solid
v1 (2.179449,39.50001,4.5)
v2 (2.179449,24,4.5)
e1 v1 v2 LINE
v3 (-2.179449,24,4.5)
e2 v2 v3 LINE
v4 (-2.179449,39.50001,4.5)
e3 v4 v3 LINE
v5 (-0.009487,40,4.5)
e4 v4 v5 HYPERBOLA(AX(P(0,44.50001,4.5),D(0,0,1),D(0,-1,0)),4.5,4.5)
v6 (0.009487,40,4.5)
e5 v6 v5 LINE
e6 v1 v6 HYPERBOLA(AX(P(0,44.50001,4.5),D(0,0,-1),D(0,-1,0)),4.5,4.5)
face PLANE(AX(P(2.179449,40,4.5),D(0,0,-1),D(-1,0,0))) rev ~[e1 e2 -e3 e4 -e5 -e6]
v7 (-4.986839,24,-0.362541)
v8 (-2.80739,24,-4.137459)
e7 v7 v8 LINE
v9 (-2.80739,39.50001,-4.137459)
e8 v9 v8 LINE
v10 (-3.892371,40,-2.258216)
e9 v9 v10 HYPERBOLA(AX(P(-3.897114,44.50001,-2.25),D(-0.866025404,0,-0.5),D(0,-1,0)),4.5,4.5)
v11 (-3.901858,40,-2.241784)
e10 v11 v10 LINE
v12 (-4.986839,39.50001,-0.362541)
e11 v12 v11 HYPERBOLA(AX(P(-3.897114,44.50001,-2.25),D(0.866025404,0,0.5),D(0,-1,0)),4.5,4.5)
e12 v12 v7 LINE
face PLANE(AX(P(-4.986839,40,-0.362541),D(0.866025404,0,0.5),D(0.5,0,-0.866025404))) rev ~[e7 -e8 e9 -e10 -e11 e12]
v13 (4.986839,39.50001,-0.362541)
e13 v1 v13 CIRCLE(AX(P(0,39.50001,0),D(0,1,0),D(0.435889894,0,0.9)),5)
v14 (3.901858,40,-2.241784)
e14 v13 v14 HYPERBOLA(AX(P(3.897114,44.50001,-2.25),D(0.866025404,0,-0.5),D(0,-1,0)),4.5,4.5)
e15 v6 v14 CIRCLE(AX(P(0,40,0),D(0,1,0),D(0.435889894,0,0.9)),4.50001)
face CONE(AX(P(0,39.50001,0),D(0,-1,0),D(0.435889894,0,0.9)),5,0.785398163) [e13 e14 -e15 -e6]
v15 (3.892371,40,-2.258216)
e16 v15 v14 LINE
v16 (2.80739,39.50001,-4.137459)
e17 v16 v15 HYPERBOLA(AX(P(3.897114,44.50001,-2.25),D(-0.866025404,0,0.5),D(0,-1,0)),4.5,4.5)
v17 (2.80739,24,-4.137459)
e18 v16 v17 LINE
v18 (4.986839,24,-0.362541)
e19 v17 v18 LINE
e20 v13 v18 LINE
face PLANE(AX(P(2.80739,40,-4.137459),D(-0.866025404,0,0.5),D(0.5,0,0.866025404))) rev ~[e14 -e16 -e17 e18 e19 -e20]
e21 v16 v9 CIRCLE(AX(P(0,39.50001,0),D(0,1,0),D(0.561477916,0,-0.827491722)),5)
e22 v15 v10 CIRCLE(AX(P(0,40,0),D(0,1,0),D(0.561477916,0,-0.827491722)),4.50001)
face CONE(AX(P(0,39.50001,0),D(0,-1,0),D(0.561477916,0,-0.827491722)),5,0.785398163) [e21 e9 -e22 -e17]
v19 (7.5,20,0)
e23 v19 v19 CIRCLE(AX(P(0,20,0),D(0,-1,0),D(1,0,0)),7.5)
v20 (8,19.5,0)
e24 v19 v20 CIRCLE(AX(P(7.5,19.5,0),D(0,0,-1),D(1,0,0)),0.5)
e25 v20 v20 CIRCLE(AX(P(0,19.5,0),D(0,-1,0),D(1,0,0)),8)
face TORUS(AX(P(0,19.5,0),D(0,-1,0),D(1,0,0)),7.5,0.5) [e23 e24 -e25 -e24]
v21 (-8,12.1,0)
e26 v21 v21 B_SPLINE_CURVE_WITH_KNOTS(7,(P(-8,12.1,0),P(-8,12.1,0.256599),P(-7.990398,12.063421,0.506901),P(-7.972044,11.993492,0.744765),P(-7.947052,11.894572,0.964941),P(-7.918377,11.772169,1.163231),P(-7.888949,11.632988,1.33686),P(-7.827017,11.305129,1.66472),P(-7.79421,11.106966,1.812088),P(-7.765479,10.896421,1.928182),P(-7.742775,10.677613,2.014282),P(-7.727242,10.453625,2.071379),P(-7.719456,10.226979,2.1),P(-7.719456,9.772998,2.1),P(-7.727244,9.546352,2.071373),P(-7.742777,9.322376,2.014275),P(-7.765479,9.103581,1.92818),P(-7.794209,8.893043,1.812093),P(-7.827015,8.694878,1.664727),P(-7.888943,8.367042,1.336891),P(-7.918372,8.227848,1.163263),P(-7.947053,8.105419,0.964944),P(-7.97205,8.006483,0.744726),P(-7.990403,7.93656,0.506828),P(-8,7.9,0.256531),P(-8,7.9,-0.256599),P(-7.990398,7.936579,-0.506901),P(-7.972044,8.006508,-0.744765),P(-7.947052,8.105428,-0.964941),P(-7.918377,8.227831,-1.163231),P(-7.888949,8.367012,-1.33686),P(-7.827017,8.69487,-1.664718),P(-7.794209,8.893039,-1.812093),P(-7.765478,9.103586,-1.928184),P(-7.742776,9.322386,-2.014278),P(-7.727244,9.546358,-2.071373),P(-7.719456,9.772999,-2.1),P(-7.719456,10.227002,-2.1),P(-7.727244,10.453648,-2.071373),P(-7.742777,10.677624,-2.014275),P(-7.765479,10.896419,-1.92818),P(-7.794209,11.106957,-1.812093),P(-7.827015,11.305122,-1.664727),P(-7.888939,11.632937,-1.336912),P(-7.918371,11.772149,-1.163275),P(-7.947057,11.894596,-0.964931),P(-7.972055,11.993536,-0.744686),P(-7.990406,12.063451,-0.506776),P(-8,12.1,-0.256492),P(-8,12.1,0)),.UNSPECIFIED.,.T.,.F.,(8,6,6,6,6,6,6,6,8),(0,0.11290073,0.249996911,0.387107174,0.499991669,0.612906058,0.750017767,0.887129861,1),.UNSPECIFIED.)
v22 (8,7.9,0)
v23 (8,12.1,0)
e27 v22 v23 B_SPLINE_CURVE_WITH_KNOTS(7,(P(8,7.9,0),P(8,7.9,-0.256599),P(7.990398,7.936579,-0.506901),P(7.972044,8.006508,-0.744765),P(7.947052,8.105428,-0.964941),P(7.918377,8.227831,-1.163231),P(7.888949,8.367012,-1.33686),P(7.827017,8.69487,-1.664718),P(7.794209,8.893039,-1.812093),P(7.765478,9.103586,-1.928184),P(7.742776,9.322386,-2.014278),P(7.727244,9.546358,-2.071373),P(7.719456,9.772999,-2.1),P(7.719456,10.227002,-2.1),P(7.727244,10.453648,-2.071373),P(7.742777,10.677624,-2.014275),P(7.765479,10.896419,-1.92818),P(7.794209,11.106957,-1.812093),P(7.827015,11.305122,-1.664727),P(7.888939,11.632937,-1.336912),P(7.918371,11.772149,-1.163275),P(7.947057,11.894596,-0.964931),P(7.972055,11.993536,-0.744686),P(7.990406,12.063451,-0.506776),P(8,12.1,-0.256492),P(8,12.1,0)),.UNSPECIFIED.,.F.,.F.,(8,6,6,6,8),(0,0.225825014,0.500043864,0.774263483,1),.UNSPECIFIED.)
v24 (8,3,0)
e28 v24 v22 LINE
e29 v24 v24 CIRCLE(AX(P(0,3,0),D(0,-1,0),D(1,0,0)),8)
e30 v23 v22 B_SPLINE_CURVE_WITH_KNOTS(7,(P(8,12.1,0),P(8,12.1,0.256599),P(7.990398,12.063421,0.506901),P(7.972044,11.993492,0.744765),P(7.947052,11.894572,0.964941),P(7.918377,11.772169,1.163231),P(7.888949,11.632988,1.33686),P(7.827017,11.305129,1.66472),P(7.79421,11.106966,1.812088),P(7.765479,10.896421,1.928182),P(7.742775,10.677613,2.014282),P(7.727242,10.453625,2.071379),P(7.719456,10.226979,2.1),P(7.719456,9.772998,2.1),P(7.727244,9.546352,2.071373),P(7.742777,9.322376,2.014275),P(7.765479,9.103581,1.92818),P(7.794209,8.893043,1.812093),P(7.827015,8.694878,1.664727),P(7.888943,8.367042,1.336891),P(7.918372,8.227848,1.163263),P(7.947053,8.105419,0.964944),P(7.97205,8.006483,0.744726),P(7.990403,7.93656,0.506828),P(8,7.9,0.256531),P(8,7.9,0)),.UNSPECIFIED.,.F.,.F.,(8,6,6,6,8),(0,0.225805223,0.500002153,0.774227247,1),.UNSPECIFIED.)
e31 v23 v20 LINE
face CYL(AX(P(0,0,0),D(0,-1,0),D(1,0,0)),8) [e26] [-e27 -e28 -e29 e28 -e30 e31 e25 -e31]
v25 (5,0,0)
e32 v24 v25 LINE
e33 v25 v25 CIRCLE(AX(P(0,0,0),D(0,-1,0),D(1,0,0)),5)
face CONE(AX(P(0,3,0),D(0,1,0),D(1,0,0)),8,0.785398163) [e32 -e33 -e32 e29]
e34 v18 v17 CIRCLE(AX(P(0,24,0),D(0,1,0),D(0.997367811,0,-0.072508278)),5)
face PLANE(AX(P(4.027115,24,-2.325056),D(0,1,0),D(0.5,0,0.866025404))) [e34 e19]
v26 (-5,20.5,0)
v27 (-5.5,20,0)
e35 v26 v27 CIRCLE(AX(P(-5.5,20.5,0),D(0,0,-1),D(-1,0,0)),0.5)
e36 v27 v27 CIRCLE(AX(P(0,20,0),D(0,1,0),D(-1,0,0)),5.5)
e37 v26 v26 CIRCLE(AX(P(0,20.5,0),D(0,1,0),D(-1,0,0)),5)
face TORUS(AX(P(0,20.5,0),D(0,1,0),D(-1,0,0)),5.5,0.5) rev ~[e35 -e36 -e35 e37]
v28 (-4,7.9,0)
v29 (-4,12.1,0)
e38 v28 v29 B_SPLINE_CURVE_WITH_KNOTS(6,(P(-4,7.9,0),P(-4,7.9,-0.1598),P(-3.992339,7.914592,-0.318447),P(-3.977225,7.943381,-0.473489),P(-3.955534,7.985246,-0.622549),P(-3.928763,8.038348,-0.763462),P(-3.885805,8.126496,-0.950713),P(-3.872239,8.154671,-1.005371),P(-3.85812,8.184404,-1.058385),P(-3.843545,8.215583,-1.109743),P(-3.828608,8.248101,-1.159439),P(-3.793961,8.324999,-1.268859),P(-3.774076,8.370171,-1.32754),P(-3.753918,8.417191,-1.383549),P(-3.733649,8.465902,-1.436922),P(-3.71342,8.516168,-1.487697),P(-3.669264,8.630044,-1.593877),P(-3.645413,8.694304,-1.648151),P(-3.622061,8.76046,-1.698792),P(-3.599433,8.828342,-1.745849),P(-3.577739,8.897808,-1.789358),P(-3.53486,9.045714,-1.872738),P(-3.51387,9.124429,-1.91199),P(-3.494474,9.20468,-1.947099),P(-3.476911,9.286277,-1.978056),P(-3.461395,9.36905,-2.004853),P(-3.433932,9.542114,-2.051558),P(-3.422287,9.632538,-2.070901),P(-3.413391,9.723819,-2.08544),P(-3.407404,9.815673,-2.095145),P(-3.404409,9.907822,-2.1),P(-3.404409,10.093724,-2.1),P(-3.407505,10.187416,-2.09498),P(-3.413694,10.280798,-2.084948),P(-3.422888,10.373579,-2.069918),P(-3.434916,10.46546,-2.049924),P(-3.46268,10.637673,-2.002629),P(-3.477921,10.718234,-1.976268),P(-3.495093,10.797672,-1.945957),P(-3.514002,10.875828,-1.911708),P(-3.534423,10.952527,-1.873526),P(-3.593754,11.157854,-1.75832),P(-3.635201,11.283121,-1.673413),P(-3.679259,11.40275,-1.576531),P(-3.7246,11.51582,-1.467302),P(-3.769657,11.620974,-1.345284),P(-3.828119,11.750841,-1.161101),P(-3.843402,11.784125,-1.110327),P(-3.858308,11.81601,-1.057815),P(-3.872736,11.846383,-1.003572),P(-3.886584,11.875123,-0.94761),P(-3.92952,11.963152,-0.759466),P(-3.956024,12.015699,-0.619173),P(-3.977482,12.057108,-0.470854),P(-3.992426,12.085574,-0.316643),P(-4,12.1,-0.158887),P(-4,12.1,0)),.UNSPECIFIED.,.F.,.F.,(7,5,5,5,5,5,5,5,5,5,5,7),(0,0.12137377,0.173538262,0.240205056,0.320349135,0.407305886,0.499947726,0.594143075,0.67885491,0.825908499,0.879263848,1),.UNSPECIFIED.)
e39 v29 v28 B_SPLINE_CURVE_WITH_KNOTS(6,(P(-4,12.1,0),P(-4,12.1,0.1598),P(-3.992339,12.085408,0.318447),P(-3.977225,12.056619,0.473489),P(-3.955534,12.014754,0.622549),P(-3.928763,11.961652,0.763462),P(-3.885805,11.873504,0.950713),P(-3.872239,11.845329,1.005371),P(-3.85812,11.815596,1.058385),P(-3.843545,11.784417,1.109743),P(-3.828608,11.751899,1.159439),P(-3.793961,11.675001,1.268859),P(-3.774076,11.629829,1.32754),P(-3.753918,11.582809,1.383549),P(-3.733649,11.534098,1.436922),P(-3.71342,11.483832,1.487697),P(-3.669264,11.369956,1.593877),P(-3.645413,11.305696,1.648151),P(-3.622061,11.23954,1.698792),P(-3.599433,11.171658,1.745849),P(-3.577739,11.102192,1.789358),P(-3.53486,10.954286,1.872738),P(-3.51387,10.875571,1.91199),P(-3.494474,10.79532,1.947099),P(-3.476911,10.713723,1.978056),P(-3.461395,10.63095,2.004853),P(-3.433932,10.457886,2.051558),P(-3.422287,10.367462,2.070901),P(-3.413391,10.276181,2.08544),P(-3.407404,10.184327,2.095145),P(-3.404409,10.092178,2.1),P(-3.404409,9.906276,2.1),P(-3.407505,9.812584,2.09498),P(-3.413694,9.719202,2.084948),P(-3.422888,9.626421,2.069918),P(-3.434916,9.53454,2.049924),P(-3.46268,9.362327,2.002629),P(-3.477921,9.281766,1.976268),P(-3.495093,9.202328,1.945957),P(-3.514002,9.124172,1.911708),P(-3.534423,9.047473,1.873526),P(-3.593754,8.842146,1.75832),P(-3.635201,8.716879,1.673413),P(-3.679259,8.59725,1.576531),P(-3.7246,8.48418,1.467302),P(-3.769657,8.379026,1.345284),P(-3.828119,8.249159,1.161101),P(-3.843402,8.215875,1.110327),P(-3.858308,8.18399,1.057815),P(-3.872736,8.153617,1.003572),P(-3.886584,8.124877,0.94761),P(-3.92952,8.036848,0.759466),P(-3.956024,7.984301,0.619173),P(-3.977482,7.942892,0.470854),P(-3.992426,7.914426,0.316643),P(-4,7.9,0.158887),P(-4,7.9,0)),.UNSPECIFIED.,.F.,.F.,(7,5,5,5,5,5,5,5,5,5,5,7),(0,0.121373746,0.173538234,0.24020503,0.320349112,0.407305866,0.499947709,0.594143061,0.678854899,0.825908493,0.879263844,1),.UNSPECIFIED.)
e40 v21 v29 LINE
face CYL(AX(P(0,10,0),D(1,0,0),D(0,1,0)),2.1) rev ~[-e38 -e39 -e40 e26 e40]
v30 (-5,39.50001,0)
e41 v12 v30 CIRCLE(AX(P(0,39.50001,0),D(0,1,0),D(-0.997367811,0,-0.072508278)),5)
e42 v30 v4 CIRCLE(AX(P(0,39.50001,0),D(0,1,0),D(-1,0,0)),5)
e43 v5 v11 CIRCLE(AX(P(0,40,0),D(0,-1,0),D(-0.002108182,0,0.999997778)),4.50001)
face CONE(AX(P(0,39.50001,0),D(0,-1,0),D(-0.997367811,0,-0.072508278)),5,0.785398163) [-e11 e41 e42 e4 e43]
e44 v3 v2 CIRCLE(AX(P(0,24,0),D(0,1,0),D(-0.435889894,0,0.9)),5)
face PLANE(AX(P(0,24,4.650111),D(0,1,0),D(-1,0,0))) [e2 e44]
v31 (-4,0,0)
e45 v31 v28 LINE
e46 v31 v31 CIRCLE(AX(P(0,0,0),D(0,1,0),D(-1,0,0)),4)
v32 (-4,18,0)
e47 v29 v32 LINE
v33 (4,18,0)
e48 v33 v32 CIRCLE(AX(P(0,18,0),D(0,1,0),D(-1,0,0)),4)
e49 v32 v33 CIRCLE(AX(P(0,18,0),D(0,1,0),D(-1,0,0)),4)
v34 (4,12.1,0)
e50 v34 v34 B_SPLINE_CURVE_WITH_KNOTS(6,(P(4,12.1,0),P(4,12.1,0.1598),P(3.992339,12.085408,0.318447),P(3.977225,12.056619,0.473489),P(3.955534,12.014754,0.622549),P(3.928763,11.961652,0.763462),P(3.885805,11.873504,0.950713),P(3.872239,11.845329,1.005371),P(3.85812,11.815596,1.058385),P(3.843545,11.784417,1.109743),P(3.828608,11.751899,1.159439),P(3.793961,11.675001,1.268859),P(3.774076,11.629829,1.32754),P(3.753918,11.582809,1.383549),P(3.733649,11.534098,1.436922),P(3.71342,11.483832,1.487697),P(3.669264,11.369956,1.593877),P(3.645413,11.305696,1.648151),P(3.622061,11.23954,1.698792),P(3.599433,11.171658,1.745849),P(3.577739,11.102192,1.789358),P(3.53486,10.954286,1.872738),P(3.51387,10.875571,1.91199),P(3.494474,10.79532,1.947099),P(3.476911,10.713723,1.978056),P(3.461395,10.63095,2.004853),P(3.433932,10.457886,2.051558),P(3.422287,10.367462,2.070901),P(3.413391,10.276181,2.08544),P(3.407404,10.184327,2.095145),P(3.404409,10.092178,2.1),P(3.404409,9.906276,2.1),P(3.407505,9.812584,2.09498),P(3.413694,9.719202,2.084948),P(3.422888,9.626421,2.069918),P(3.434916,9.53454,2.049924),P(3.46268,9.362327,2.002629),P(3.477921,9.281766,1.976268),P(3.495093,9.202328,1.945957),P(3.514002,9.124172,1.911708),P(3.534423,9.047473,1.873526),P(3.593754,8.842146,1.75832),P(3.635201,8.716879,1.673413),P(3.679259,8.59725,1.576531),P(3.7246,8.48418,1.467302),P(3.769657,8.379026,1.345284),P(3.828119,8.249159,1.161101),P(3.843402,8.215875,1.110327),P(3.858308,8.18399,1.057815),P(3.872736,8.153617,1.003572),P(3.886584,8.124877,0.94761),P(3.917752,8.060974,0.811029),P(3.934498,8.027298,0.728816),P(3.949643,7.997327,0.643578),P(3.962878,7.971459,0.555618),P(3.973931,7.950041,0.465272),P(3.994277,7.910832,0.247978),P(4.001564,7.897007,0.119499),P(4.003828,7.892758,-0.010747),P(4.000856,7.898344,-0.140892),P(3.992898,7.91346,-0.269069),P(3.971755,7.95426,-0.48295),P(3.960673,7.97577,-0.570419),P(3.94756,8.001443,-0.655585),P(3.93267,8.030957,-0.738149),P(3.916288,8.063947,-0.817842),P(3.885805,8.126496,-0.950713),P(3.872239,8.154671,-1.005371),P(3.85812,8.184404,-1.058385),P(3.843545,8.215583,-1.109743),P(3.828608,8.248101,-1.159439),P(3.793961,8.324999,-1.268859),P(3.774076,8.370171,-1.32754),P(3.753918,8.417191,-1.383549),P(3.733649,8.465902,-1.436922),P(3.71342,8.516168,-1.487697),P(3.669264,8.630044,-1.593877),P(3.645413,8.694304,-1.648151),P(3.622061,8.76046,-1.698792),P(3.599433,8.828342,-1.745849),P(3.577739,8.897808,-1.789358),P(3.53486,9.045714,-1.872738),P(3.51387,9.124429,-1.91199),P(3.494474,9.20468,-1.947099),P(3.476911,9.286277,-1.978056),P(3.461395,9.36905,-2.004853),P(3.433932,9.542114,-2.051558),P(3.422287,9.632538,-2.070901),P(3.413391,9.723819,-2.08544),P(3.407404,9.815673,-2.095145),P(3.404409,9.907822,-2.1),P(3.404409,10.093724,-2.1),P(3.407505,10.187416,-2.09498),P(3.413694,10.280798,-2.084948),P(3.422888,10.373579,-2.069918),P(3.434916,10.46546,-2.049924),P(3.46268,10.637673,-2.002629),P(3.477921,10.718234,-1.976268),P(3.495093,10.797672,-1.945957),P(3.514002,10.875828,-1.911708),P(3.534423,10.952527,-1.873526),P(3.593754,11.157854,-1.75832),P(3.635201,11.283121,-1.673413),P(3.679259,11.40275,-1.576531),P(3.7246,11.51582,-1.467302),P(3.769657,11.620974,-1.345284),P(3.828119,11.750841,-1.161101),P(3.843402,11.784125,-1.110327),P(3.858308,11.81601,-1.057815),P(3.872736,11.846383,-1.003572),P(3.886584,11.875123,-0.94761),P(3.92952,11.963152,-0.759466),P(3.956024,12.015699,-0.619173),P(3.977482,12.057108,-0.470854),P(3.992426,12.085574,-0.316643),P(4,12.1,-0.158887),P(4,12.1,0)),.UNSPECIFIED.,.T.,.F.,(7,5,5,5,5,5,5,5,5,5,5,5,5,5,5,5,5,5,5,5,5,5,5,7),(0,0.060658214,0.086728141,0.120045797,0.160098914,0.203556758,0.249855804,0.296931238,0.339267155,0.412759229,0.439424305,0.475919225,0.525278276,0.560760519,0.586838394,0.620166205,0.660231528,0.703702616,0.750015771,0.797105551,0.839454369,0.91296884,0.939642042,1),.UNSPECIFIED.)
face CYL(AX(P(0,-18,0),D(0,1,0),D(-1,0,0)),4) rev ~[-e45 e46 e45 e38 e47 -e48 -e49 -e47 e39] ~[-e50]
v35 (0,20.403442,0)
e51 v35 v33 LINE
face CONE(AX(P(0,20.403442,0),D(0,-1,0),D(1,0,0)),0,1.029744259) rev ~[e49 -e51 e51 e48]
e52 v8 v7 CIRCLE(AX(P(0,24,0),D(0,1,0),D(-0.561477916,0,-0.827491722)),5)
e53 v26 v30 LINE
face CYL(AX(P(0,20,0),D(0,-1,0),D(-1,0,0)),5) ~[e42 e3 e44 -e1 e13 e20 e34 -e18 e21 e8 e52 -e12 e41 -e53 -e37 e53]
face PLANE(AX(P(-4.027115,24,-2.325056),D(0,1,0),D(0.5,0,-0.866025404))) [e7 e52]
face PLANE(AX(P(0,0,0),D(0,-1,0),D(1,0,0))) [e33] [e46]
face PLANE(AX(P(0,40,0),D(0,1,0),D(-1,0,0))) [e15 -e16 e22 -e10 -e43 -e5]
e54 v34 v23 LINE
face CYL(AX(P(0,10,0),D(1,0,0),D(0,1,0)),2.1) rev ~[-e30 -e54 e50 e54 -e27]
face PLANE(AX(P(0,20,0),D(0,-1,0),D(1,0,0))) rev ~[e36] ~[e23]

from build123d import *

# Parameters (mm, degrees)
F0_R            = 8
F1_DEPTH        = 20
F2_R            = 5
F3_DEPTH        = 20
F5_DEPTH        = 16
F5_COPIES_COUNT = 3
F6_SIZE         = 0.49999
F7_R            = 0.5
F9_D            = 8
F9_DEPTH        = 18
F9_TIP          = 2.4034424761
F10_R           = 2.1
F11_DEPTH       = 8.25
F12_SIZE        = 3


# Not quite as in the source:
# - a fillet or chamfer is up to 0.001 mm smaller than in the source, because OpenCascade refuses the exact size
# - a pattern or mirror of a feature is missing from the dataset's text; its kind, count and spacing are read off the source's solid


with BuildPart() as f1:
    # F0 (on Front) → F1 (new body)
    with BuildSketch(Plane.XZ):
        Circle(F0_R)
    extrude(amount=-F1_DEPTH)

    # F2 (on face) → F3 (join)
    with BuildSketch(Plane(origin=(0, 20, 0), x_dir=(-1, 0, 0), z_dir=(0, 1, 0))):
        Circle(F2_R)
    extrude(amount=F3_DEPTH)

    # F4 (on face) → F5 (cut)
    with BuildSketch(Plane(origin=(0, 40, 0), x_dir=(-1, 0, 0), z_dir=(0, 1, 0))):
        with BuildLine():
            ThreePointArc((2.1794494718, 4.5), (0, 5), (-2.1794494718, 4.5))
            Line((-2.1794494718, 4.5), (2.1794494718, 4.5))
        make_face()
    f5 = extrude(amount=-F5_DEPTH, mode=Mode.SUBTRACT)

    # F5_copies: F5 ×3 about axis
    f5_copies_axis = Axis((0, 0, 0), (0, 1, 0))
    for i in range(1, F5_COPIES_COUNT):
        add(f5.rotate(f5_copies_axis, i * 360 / F5_COPIES_COUNT), mode=Mode.SUBTRACT)

    # F6 (size 0.5 in the source; OpenCascade refuses exactly that, so slightly less here)
    f6_edges = [f1.edges().sort_by_distance(p)[0] for p in [
        (4.330127, 40, 2.5),
        (-4.996709, 40, -0.18139),
        (0, 40, -5),
        (-4.236582, 40, 2.655443),
    ]]
    chamfer(f6_edges, length=F6_SIZE)

    # F7
    f7_edges = [f1.edges().sort_by_distance(p)[0] for p in [
        (-8, 20, 0),
        (5, 20, 0),
    ]]
    fillet(f7_edges, radius=F7_R)

    # F9
    with Locations(Plane.XZ):
        with Locations((0, 0)):
            Hole(F9_D / 2, depth=F9_DEPTH)
            with Locations((0, 0, -(F9_DEPTH + F9_TIP / 2))):  # 118° drill point
                Cone(0, F9_D / 2, F9_TIP, mode=Mode.SUBTRACT)

    # F10 (on Right) → F11 (cut, symmetric)
    with BuildSketch(Plane.YZ):
        with Locations((10, 0)):
            Circle(F10_R)
    extrude(amount=F11_DEPTH, both=True, mode=Mode.SUBTRACT)

    # F12
    f12_edges = [f1.edges().sort_by_distance(p)[0] for p in [
        (-8, 0, 0),
    ]]
    chamfer(f12_edges, length=F12_SIZE)


solid = f1.part
